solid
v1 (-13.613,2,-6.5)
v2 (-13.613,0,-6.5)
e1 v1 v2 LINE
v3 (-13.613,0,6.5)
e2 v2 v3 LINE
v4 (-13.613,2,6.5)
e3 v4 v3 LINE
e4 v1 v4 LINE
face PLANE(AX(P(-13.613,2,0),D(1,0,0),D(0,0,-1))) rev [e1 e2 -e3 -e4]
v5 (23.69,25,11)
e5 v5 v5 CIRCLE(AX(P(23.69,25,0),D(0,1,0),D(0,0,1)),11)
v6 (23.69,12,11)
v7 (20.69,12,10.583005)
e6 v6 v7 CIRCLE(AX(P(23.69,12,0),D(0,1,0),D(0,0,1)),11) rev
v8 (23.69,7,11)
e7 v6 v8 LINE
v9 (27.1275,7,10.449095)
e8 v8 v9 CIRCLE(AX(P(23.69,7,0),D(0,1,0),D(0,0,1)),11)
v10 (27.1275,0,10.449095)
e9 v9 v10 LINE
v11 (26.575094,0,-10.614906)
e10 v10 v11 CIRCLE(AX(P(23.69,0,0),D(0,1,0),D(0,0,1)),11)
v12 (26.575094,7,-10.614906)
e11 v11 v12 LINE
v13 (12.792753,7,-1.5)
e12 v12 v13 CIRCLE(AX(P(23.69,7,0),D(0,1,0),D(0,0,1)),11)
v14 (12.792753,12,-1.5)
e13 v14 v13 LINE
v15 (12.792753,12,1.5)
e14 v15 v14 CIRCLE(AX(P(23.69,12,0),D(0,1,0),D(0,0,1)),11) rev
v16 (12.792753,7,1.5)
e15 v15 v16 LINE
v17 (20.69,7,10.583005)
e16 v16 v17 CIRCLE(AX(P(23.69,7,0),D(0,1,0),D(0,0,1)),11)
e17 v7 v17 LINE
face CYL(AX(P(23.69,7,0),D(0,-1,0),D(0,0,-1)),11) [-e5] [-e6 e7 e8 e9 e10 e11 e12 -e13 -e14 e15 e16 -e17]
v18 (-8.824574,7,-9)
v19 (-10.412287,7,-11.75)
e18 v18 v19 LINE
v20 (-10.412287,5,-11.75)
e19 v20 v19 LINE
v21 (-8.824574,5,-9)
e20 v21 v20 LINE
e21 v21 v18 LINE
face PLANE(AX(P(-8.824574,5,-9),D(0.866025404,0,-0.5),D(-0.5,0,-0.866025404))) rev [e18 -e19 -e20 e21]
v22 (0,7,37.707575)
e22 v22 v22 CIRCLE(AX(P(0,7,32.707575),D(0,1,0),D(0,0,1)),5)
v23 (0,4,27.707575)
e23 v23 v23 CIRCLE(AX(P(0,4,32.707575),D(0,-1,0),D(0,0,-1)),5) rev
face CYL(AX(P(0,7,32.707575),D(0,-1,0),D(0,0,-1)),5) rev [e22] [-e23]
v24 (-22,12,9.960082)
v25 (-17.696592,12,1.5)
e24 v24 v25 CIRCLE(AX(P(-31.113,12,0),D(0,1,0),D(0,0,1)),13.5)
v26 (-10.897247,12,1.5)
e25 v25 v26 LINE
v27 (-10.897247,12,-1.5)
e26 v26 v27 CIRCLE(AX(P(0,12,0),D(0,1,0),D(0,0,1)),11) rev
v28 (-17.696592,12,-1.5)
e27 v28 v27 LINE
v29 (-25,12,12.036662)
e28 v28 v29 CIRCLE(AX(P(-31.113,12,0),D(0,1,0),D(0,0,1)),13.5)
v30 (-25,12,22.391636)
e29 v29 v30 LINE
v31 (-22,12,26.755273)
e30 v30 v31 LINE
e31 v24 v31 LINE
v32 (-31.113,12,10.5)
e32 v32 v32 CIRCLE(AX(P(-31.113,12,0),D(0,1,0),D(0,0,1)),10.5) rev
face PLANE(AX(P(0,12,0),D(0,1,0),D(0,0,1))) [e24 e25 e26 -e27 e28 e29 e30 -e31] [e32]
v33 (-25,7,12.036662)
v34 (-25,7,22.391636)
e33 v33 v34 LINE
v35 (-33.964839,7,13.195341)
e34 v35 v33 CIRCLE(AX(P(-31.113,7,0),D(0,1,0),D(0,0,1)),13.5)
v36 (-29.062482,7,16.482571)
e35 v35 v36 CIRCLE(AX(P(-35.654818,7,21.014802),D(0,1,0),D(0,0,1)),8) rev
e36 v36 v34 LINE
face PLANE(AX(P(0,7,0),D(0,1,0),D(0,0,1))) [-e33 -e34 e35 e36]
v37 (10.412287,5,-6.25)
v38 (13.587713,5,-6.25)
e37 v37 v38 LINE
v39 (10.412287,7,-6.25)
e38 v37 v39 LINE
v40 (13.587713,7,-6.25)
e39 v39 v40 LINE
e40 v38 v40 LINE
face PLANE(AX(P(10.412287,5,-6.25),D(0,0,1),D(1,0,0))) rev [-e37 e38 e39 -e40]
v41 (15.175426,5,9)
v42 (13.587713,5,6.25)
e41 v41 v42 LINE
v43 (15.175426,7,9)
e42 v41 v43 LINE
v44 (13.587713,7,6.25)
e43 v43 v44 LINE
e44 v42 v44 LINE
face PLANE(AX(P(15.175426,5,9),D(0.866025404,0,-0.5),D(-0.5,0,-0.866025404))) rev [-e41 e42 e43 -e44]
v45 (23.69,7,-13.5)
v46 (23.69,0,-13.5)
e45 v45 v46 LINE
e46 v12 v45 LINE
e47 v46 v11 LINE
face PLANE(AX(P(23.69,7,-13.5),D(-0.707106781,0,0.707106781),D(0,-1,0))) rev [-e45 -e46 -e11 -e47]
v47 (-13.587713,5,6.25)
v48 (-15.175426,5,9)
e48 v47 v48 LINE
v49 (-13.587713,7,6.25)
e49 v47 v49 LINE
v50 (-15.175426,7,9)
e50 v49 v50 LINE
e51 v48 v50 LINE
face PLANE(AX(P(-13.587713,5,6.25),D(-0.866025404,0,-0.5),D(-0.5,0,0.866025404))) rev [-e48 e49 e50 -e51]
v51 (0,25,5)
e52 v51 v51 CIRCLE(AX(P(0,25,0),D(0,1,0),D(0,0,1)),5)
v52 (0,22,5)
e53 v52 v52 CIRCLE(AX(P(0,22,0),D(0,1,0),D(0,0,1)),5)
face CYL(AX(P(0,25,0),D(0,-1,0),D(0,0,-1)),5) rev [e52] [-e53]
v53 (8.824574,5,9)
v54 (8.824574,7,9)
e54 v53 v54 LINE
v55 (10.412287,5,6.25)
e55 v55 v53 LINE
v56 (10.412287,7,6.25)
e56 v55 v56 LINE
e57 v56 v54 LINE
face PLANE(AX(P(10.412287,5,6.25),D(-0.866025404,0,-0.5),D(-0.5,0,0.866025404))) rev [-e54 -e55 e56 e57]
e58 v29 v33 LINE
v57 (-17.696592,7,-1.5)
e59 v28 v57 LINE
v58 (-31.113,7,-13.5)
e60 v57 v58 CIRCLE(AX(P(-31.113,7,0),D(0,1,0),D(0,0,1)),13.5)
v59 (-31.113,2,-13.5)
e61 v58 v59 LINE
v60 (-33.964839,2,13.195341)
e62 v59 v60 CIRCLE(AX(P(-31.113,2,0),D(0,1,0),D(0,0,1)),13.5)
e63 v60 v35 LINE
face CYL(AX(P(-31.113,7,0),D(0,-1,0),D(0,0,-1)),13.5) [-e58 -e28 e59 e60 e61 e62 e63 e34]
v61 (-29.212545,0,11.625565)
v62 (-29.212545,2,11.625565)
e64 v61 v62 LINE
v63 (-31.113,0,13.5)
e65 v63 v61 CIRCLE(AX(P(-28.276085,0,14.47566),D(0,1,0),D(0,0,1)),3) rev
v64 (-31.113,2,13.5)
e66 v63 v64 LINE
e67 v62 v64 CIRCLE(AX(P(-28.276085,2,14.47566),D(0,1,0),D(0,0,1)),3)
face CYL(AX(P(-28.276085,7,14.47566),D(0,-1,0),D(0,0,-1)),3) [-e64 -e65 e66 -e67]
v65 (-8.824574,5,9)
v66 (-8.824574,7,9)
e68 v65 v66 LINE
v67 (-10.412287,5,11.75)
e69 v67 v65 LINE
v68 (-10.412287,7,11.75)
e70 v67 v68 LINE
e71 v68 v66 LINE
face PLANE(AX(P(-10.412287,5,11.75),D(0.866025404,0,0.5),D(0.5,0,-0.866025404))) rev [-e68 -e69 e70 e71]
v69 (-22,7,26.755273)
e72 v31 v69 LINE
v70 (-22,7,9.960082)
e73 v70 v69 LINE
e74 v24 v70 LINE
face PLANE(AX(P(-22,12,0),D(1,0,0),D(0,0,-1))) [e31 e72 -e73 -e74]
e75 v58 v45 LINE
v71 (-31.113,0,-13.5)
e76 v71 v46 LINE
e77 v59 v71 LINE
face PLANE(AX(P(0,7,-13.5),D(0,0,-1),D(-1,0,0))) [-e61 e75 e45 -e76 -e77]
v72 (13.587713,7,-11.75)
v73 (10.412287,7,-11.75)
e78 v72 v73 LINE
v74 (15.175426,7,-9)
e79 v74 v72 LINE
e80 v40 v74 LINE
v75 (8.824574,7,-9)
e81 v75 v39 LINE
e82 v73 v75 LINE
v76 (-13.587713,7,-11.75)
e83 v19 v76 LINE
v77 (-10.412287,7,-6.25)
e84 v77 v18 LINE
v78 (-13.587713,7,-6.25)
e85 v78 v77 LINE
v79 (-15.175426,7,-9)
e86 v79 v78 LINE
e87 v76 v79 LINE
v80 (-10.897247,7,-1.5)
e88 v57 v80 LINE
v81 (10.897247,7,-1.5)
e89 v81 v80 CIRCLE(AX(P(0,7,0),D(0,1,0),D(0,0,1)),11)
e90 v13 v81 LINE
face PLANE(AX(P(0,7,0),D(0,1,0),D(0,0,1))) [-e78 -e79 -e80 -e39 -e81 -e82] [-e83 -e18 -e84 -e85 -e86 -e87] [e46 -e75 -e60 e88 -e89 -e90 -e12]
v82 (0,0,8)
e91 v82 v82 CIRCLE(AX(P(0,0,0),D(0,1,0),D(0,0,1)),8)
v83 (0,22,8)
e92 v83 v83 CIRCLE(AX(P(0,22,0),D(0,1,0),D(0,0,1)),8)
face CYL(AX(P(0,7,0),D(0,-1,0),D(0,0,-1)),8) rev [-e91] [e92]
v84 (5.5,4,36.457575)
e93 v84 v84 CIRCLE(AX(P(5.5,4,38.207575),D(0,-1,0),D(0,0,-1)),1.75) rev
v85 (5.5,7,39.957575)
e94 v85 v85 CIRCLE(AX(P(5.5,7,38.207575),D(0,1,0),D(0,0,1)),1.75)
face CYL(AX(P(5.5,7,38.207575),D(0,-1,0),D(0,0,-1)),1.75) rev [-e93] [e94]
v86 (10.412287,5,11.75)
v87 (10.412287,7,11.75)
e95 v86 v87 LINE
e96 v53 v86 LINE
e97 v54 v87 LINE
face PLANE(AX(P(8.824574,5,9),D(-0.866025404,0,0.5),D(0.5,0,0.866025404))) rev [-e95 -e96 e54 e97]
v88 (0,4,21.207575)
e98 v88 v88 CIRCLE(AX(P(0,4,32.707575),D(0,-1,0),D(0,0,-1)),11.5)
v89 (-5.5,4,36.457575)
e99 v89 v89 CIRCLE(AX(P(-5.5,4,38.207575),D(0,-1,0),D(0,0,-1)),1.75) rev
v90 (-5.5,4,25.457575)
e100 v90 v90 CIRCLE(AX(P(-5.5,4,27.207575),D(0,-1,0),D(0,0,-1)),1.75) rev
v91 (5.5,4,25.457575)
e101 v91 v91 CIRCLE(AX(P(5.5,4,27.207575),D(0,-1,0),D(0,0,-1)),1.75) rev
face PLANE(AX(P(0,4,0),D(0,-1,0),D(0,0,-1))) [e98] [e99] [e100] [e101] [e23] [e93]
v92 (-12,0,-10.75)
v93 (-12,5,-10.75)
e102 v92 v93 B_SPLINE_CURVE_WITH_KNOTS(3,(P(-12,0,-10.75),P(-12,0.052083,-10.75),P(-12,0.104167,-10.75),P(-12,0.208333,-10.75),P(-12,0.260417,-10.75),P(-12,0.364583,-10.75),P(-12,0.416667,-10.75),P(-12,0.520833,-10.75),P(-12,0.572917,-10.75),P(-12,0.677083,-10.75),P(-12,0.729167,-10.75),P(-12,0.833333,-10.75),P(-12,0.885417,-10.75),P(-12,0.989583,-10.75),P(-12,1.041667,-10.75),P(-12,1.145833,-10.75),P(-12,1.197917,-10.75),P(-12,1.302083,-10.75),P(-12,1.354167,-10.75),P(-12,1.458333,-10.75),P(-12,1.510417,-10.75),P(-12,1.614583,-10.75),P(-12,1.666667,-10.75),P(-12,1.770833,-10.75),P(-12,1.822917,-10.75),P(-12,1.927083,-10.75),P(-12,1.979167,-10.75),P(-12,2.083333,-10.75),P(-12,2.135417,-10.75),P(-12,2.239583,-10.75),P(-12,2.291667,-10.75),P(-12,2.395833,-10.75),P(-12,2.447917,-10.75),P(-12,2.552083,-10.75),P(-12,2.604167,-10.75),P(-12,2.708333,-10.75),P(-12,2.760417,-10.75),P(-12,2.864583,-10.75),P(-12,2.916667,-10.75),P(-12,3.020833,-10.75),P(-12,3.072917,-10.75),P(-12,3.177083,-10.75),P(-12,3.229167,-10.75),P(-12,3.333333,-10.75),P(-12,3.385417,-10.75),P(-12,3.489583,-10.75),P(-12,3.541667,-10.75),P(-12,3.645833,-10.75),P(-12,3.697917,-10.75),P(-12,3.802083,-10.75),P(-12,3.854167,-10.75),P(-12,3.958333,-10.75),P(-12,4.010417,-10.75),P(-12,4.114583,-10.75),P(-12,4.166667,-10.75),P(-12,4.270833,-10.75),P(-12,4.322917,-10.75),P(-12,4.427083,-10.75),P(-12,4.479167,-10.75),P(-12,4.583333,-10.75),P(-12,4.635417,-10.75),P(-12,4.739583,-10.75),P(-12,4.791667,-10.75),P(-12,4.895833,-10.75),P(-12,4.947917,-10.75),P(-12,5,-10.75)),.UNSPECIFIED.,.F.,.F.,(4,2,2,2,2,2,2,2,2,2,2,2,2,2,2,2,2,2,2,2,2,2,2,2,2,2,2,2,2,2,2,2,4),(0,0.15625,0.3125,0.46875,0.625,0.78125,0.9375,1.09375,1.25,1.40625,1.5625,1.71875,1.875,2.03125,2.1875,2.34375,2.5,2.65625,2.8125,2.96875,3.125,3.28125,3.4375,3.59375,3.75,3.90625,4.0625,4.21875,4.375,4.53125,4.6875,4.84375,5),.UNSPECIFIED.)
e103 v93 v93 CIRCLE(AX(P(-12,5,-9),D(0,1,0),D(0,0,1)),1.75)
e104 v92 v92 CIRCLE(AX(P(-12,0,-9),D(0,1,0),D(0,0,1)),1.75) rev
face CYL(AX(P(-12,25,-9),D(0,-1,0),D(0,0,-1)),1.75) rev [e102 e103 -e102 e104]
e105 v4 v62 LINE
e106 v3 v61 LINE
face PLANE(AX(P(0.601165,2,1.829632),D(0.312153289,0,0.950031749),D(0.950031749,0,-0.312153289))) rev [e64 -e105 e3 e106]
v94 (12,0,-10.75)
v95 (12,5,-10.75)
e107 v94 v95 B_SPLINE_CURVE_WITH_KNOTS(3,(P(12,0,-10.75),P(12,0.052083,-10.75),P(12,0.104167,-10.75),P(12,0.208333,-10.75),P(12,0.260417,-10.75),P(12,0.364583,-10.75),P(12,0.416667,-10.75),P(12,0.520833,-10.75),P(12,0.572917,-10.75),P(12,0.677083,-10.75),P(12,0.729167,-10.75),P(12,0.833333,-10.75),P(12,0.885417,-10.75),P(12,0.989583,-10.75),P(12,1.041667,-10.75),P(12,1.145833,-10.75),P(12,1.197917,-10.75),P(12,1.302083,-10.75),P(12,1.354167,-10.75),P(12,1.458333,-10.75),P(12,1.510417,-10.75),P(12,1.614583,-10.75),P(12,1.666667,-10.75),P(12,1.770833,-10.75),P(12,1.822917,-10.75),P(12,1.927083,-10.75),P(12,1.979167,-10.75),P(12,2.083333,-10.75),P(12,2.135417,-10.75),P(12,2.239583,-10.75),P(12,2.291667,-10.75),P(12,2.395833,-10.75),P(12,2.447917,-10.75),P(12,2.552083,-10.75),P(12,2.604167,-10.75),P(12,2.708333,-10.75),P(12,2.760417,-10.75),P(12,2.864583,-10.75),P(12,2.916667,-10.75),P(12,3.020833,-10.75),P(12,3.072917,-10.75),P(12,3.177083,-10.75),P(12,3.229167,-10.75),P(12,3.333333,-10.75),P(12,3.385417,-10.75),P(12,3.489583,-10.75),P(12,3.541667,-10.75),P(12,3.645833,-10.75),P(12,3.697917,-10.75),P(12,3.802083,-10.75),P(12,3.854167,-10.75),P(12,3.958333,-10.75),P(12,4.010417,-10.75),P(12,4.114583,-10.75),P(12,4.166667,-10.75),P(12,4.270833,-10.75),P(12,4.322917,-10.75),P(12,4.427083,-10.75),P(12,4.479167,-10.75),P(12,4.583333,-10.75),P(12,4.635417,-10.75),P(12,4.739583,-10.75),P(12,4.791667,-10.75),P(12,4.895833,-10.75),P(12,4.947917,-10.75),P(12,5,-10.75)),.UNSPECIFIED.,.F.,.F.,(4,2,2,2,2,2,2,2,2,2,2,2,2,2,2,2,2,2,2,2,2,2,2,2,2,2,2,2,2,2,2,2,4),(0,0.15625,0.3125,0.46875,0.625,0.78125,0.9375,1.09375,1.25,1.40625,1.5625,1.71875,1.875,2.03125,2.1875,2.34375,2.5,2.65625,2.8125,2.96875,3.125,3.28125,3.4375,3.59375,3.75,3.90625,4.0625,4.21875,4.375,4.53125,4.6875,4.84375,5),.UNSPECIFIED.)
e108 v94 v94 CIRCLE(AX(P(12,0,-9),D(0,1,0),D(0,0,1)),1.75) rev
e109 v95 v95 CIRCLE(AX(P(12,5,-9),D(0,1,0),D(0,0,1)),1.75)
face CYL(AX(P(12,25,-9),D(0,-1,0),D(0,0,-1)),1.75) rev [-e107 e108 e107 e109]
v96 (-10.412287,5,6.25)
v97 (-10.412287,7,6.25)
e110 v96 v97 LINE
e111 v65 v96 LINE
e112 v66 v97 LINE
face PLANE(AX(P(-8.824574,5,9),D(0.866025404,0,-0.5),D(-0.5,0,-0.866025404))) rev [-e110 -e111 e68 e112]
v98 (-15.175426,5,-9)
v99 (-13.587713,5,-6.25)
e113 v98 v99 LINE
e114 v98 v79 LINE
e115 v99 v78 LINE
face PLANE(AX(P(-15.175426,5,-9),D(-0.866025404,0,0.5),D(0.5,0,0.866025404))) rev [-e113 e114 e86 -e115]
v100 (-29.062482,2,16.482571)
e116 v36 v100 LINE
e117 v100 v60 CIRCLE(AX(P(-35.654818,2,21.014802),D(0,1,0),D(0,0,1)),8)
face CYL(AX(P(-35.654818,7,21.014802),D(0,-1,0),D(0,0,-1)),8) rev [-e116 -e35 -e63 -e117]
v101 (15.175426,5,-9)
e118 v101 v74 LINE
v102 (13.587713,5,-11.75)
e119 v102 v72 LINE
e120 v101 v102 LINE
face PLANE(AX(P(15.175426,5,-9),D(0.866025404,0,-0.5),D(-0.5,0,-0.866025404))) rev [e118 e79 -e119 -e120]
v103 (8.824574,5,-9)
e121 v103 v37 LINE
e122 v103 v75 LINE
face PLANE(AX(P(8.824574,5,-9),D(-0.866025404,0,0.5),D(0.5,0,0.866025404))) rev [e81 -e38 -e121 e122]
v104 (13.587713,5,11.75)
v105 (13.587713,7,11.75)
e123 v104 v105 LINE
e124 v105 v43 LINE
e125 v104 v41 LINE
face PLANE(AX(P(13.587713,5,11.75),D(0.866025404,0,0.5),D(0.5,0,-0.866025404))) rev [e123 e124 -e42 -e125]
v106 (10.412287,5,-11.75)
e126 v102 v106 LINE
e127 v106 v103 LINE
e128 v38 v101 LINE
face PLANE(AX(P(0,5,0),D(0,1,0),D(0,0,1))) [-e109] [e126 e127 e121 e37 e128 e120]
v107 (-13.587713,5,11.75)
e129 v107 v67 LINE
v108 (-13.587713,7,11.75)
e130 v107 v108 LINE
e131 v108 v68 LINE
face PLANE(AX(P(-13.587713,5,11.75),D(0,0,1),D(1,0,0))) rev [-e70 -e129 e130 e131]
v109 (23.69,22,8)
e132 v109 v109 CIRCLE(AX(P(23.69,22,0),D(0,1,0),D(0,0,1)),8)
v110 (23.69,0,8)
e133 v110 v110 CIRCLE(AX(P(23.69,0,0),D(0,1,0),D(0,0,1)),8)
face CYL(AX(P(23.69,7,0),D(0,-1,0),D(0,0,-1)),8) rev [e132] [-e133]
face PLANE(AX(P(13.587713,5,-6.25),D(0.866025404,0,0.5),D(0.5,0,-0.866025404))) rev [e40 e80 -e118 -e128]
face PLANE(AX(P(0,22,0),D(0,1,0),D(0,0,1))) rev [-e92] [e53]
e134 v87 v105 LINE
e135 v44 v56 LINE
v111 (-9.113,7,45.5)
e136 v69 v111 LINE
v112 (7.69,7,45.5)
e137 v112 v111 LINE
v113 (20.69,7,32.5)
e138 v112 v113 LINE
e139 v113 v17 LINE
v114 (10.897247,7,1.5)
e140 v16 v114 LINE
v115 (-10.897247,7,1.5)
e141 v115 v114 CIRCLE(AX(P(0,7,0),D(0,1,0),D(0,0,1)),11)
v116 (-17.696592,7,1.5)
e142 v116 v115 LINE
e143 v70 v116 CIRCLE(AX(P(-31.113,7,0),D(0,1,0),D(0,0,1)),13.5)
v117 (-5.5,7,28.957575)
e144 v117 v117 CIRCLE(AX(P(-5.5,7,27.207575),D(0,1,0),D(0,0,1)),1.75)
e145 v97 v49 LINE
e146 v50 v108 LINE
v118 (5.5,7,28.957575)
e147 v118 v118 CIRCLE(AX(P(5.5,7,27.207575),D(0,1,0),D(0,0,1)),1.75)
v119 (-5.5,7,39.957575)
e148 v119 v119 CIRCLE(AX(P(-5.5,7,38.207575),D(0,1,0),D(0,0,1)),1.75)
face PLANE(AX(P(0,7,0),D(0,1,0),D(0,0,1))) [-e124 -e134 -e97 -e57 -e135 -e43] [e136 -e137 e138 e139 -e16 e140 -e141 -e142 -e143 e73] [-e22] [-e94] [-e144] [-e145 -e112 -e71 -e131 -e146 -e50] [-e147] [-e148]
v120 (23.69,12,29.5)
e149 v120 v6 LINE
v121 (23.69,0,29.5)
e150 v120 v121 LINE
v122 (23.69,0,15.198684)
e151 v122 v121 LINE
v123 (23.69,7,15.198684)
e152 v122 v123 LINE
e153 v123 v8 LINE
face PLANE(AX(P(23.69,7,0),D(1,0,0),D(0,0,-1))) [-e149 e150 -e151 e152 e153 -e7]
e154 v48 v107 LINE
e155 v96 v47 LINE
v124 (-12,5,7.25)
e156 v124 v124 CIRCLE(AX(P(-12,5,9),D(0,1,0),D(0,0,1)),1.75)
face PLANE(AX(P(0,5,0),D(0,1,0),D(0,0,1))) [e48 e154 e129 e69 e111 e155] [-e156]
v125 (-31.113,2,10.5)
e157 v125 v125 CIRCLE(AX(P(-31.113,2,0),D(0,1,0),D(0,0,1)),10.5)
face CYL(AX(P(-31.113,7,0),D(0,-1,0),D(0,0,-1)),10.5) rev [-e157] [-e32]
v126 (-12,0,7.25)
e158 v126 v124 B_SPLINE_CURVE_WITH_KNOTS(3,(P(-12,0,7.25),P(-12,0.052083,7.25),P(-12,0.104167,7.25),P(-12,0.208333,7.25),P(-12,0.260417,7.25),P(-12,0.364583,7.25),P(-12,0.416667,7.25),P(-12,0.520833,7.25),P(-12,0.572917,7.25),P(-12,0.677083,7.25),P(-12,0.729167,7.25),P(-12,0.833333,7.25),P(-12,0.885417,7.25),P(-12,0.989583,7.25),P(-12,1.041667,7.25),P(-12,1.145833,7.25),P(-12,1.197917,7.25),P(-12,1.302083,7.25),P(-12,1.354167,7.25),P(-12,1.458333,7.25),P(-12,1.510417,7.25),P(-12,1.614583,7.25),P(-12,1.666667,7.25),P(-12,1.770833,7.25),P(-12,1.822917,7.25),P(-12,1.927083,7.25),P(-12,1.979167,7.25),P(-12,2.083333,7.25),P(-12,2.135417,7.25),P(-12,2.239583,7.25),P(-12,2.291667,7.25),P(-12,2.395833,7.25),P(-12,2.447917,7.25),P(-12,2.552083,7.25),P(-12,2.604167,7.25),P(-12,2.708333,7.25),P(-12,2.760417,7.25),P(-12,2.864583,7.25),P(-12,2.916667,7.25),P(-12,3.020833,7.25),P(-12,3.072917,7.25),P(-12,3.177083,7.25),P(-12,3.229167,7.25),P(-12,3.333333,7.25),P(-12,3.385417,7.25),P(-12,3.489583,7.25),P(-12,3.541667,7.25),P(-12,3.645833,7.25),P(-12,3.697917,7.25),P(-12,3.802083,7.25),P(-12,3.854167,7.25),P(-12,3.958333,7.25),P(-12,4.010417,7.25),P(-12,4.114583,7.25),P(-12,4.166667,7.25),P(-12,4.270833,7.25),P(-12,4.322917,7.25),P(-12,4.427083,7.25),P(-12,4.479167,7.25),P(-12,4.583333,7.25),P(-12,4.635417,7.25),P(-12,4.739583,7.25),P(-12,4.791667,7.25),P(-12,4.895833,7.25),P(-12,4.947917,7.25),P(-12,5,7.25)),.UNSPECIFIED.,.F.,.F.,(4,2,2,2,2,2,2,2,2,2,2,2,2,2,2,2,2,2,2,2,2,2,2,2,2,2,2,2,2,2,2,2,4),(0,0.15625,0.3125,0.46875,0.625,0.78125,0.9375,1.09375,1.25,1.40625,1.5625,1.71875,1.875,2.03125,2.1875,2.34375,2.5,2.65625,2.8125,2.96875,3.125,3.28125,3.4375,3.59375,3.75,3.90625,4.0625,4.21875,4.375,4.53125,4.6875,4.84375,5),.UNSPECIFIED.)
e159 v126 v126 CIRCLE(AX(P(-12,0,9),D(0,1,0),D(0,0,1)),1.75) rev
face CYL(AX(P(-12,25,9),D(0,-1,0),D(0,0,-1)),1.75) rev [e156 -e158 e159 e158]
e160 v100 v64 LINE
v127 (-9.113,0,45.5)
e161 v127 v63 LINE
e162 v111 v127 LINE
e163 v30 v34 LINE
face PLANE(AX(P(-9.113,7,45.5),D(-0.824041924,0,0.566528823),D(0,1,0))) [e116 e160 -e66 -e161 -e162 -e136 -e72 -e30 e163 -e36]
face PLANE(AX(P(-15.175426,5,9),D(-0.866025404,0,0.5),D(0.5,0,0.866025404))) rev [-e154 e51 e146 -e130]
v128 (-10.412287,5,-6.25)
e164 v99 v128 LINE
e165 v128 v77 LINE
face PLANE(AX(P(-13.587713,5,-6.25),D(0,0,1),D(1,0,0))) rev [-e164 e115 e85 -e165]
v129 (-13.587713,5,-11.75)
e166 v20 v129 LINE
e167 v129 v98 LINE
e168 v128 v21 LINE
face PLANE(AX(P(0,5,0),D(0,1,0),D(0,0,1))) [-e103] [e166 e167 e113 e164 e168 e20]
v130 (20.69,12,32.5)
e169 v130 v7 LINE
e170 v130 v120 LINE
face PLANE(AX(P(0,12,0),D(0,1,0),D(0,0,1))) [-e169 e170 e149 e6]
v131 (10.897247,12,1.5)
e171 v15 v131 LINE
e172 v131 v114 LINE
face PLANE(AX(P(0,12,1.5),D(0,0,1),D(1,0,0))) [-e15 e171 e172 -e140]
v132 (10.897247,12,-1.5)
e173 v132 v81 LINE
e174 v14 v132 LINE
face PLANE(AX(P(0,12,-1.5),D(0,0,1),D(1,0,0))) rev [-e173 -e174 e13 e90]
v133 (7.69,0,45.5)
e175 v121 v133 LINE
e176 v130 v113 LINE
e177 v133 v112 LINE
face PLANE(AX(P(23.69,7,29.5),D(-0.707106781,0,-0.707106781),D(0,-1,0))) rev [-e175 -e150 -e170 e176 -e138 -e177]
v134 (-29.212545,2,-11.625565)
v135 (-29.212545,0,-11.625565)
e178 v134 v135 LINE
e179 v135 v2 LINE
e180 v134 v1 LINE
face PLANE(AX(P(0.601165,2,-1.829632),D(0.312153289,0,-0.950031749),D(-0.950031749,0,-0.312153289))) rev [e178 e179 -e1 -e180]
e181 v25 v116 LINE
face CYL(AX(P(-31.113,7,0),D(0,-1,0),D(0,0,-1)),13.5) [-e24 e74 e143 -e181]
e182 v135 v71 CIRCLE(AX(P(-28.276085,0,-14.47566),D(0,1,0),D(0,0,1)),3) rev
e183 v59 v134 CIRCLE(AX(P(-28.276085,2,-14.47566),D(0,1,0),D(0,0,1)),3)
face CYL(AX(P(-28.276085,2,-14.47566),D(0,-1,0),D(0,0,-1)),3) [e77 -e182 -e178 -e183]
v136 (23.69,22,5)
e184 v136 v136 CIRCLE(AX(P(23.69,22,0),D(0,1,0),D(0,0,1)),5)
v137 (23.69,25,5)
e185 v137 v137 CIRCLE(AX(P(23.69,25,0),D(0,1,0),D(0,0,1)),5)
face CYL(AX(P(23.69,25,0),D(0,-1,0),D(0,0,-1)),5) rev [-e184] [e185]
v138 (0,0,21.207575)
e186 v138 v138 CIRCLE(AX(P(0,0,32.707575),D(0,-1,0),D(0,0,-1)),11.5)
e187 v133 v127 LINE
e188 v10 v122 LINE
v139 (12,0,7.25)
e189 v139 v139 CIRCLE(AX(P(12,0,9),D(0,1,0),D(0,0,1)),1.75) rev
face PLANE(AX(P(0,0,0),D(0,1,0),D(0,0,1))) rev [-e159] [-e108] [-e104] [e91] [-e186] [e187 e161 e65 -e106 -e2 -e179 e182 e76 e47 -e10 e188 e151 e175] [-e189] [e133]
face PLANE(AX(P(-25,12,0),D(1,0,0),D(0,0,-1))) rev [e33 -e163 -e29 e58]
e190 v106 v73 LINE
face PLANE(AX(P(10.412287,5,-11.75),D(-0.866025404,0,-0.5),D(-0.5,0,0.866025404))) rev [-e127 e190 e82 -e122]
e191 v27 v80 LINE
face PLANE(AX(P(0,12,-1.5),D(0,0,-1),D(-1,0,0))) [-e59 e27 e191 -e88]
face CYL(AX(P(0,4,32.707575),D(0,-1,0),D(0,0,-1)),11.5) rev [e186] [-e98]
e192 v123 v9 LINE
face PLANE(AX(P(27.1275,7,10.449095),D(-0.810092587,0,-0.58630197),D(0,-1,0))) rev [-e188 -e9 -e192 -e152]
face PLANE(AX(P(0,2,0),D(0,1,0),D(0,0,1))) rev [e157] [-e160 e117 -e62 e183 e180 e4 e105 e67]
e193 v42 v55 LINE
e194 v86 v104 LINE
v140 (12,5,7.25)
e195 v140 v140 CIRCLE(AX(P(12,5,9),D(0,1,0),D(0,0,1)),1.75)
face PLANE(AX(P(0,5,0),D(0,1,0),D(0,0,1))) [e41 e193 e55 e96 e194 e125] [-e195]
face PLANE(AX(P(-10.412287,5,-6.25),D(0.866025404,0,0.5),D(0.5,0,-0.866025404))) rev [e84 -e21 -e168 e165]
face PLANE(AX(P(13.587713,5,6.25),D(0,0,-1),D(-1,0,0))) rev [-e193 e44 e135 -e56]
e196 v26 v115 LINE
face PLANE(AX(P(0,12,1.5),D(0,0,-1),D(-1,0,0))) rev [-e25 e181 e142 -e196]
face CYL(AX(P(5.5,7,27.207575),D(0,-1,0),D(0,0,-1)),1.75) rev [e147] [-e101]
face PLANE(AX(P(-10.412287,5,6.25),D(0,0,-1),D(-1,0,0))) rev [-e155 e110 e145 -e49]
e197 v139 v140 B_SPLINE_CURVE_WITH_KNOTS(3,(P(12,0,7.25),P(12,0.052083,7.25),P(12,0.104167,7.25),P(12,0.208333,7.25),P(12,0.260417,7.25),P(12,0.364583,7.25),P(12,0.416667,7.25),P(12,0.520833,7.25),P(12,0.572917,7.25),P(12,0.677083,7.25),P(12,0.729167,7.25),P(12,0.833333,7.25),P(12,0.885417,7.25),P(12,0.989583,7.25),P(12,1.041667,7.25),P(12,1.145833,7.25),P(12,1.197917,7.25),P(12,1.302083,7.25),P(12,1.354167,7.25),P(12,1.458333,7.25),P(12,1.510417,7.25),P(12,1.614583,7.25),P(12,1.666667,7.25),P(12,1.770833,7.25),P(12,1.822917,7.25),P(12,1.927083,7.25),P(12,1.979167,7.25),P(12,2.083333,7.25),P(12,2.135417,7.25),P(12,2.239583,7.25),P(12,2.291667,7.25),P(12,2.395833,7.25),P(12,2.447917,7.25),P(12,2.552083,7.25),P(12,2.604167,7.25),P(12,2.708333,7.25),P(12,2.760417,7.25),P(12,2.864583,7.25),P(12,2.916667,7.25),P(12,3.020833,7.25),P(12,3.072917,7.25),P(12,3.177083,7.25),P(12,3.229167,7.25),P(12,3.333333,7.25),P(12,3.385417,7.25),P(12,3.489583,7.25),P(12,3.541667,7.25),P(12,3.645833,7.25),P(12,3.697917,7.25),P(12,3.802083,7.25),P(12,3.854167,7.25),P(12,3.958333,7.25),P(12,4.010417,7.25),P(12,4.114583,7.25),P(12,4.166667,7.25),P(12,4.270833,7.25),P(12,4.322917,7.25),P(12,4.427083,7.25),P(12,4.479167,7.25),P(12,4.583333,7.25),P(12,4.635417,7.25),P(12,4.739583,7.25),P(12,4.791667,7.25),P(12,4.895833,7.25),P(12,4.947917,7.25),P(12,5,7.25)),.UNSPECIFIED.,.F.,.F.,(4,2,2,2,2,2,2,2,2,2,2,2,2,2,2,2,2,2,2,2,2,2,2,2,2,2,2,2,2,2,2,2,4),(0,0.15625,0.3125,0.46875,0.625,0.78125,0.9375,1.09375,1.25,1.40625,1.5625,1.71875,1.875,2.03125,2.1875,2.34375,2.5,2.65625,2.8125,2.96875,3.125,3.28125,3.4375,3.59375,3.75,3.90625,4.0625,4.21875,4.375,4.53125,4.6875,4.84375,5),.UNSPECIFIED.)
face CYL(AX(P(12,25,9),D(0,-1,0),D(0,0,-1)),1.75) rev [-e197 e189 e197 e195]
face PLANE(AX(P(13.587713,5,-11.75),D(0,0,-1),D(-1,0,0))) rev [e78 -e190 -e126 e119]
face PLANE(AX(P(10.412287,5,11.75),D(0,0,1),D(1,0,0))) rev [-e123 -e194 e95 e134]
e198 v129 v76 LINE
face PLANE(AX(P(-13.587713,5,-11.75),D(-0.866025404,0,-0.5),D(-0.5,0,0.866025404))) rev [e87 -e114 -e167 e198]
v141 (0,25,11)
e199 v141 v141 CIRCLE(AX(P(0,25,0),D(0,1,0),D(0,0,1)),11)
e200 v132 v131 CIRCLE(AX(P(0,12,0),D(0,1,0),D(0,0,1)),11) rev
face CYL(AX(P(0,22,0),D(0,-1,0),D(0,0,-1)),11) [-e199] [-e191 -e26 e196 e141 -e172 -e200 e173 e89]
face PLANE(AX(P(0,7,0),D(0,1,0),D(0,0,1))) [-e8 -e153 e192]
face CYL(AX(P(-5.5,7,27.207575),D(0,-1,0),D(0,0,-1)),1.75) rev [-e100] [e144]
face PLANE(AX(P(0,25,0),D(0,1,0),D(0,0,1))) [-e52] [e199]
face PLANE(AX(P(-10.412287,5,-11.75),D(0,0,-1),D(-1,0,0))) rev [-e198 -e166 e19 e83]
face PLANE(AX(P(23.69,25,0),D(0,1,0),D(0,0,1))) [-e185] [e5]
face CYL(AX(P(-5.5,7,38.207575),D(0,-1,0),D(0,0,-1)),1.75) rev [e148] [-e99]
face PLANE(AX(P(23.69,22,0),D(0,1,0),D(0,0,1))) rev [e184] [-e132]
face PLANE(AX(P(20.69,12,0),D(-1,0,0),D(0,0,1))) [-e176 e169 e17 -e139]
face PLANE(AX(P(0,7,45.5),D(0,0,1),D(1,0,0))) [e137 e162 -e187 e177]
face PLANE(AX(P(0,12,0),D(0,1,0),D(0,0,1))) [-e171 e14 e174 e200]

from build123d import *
from build123d.topology import SkipClean

# Parameters (mm, degrees)
SKETCH3_R               = 8
SKETCH3_W               = 54.803
SKETCH3_H               = 32
SKETCH3_R_2             = 5
BOSS_EXTRUDE1_DEPTH     = 7
CUT_EXTRUDE3_DEPTH      = 65.105926161
CUT_EXTRUDE3_DEPTH_BACK = 65.105926161
SKETCH4_R               = 1.75
SKETCH6_R               = 11
SKETCH6_R_2             = 8
BOSS_EXTRUDE2_DEPTH     = 15
SKETCH7_R               = 11
SKETCH7_R_2             = 5
BOSS_EXTRUDE3_DEPTH     = 3
CHAMFER1_SIZE           = 2.5
CUT_EXTRUDE4_DEPTH      = 2
CUT_EXTRUDE5_DEPTH      = 69.451221823
CUT_EXTRUDE5_DEPTH_BACK = 69.451221823
SKETCH9_R               = 1.75
CUT_EXTRUDE6_START      = -2
SKETCH10_R              = 1.75
CUT_EXTRUDE6_DEPTH      = 2
CHAMFER3_SIZE           = 32
CHAMFER3_SIZE2          = 22
CHAMFER4_SIZE           = 16
FILLET1_R               = 8
SKETCH12_R              = 10.5
BOSS_EXTRUDE4_DEPTH     = 5
BOSS_EXTRUDE5_DEPTH     = 5
SKETCH14_R              = 11.5
SKETCH14_R_2            = 5
SKETCH14_R_3            = 1.75
CUT_EXTRUDE8_DEPTH      = 4
FILLET2_R               = 3


with BuildPart() as part:
    # Sketch3 → Boss-Extrude1 (new body)
    # profile 1 of 10: a face of its own
    with BuildSketch(Plane(origin=(0, 0, 0), x_dir=(1, 0, 0), z_dir=(0, 1, 0))):
        with BuildLine():
            ThreePointArc((-17.613, 0), (-21.567058454, 9.545941546), (-31.113, 13.5))
            Line((-31.113, 13.5), (-31.113, 10.5))
            ThreePointArc((-31.113, 10.5), (-23.688378798, 7.424621202), (-20.613, 0))
            ThreePointArc((-20.613, 0), (-23.688378798, -7.424621202), (-31.113, -10.5))
            Line((-31.113, -10.5), (-31.113, -13.5))
            ThreePointArc((-31.113, -13.5), (-21.567058454, -9.545941546), (-17.613, 0))
        make_face()
    # profile 2 of 10: a face of its own
    with BuildSketch(Plane(origin=(0, 0, 0), x_dir=(1, 0, 0), z_dir=(0, 1, 0))):
        with BuildLine():
            Line((-31.113, 10.5), (-31.113, 13.5))
            ThreePointArc((-31.113, 13.5), (-44.613, 0), (-31.113, -13.5))
            Line((-31.113, -13.5), (-31.113, -10.5))
            ThreePointArc((-31.113, -10.5), (-41.613, 0), (-31.113, 10.5))
        make_face()
    # profile 3 of 10: a face of its own
    with BuildSketch(Plane(origin=(0, 0, 0), x_dir=(1, 0, 0), z_dir=(0, 1, 0))):
        with BuildLine():
            Line((23.69, 13.5), (-31.113, 13.5))
            ThreePointArc((-31.113, 13.5), (-21.567058454, 9.545941546), (-17.613, 0))
            ThreePointArc((-17.613, 0), (-21.567058454, -9.545941546), (-31.113, -13.5))
            Line((-31.113, -13.5), (23.69, -13.5))
            Line((23.69, -13.5), (23.69, -11))
            ThreePointArc((23.69, -11), (12.69, 0), (23.69, 11))
            Line((23.69, 11), (23.69, 13.5))
        make_face()
        with Locations(Location((0, 0, 0), (0, 0, 270))):
            Circle(SKETCH3_R, mode=Mode.SUBTRACT)
    # profile 4 of 10: a face of its own
    with BuildSketch(Plane(origin=(0, 0, 0), x_dir=(1, 0, 0), z_dir=(0, 1, 0))):
        with BuildLine():
            ThreePointArc((-17.613, 0), (-21.567058454, 9.545941546), (-31.113, 13.5))
            Line((-31.113, 13.5), (-31.113, 10.5))
            ThreePointArc((-31.113, 10.5), (-23.688378798, 7.424621202), (-20.613, 0))
            ThreePointArc((-20.613, 0), (-23.688378798, -7.424621202), (-31.113, -10.5))
            Line((-31.113, -10.5), (-31.113, -13.5))
            ThreePointArc((-31.113, -13.5), (-21.567058454, -9.545941546), (-17.613, 0))
        make_face()
    # profile 5 of 10: a face of its own
    with BuildSketch(Plane(origin=(0, 0, 0), x_dir=(1, 0, 0), z_dir=(0, 1, 0))):
        with BuildLine():
            Line((-31.113, 10.5), (-31.113, 13.5))
            ThreePointArc((-31.113, 13.5), (-44.613, 0), (-31.113, -13.5))
            Line((-31.113, -13.5), (-31.113, -10.5))
            ThreePointArc((-31.113, -10.5), (-41.613, 0), (-31.113, 10.5))
        make_face()
    # profile 6 of 10: a face of its own
    with BuildSketch(Plane(origin=(0, 0, 0), x_dir=(1, 0, 0), z_dir=(0, 1, 0))):
        with BuildLine():
            ThreePointArc((34.69, 0), (31.468174593, 7.778174593), (23.69, 11))
            Line((23.69, 11), (23.69, 8))
            ThreePointArc((23.69, 8), (29.346854249, 5.656854249), (31.69, 0))
            ThreePointArc((31.69, 0), (29.346854249, -5.656854249), (23.69, -8))
            Line((23.69, -8), (23.69, -11))
            ThreePointArc((23.69, -11), (31.468174593, -7.778174593), (34.69, 0))
        make_face()
    # profile 7 of 10: a face of its own
    with BuildSketch(Plane(origin=(0, 0, 0), x_dir=(1, 0, 0), z_dir=(0, 1, 0))):
        with BuildLine():
            Line((23.69, 8), (23.69, 11))
            ThreePointArc((23.69, 11), (12.69, 0), (23.69, -11))
            Line((23.69, -11), (23.69, -8))
            ThreePointArc((23.69, -8), (15.69, 0), (23.69, 8))
        make_face()
    # profile 8 of 10: a face of its own
    with BuildSketch(Plane(origin=(0, 0, 0), x_dir=(1, 0, 0), z_dir=(0, 1, 0))):
        with Locations((-3.7115, -29.5)):
            Rectangle(SKETCH3_W, SKETCH3_H)
        with Locations(Location((0, -32.707574931, 0), (0, 0, 270))):
            Circle(SKETCH3_R_2, mode=Mode.SUBTRACT)
    # profile 9 of 10: a face of its own
    with BuildSketch(Plane(origin=(0, 0, 0), x_dir=(1, 0, 0), z_dir=(0, 1, 0))):
        with BuildLine():
            ThreePointArc((34.69, 0), (31.468174593, 7.778174593), (23.69, 11))
            Line((23.69, 11), (23.69, 8))
            ThreePointArc((23.69, 8), (29.346854249, 5.656854249), (31.69, 0))
            ThreePointArc((31.69, 0), (29.346854249, -5.656854249), (23.69, -8))
            Line((23.69, -8), (23.69, -11))
            ThreePointArc((23.69, -11), (31.468174593, -7.778174593), (34.69, 0))
        make_face()
    # profile 10 of 10: a face of its own
    with BuildSketch(Plane(origin=(0, 0, 0), x_dir=(1, 0, 0), z_dir=(0, 1, 0))):
        with BuildLine():
            Line((23.69, 8), (23.69, 11))
            ThreePointArc((23.69, 11), (12.69, 0), (23.69, -11))
            Line((23.69, -11), (23.69, -8))
            ThreePointArc((23.69, -8), (15.69, 0), (23.69, 8))
        make_face()
    extrude(amount=BOSS_EXTRUDE1_DEPTH)

    # Sketch4 → Cut-Extrude3 (cut, two sides: drawn at the far end of the back side and taken through both)
    with BuildSketch(Plane(origin=(0, 0, 0), x_dir=(1, 0, 0), z_dir=(0, 1, 0)).offset(-CUT_EXTRUDE3_DEPTH_BACK)):
        with Locations(Location((5.5, -27.207574931, 0), (0, 0, 270))):
            Circle(SKETCH4_R)
        with Locations(Location((5.5, -38.207574931, 0), (0, 0, 270))):
            Circle(SKETCH4_R)
        with Locations(Location((-5.5, -38.207574931, 0), (0, 0, 270))):
            Circle(SKETCH4_R)
        with Locations(Location((-5.5, -27.207574931, 0), (0, 0, 270))):
            Circle(SKETCH4_R)
    extrude(amount=CUT_EXTRUDE3_DEPTH + CUT_EXTRUDE3_DEPTH_BACK, mode=Mode.SUBTRACT)

    # Sketch6 → Boss-Extrude2 (add)
    # profile 1 of 2: a face of its own
    with BuildSketch(Plane(origin=(0, 7, 0), x_dir=(1, 0, 0), z_dir=(0, 1, 0))):
        with Locations(Location((23.69, 0, 0), (0, 0, 270))):
            Circle(SKETCH6_R)
        with Locations(Location((23.69, 0, 0), (0, 0, 270))):
            Circle(SKETCH6_R_2, mode=Mode.SUBTRACT)
    # profile 2 of 2: a face of its own
    with BuildSketch(Plane(origin=(0, 7, 0), x_dir=(1, 0, 0), z_dir=(0, 1, 0))):
        with Locations(Location((0, 0, 0), (0, 0, 270))):
            Circle(SKETCH6_R)
        with Locations(Location((0, 0, 0), (0, 0, 270))):
            Circle(SKETCH6_R_2, mode=Mode.SUBTRACT)
    extrude(amount=BOSS_EXTRUDE2_DEPTH)

    # Sketch7 → Boss-Extrude3 (add)
    # profile 1 of 2: a face of its own
    with BuildSketch(Plane(origin=(0, 22, 0), x_dir=(1, 0, 0), z_dir=(0, 1, 0))):
        with Locations(Location((23.69, 0, 0), (0, 0, 270))):
            Circle(SKETCH7_R)
        with Locations(Location((23.69, 0, 0), (0, 0, 270))):
            Circle(SKETCH7_R_2, mode=Mode.SUBTRACT)
    # profile 2 of 2: a face of its own
    with BuildSketch(Plane(origin=(0, 22, 0), x_dir=(1, 0, 0), z_dir=(0, 1, 0))):
        with Locations(Location((0, 0, 0), (0, 0, 270))):
            Circle(SKETCH7_R)
        with Locations(Location((0, 0, 0), (0, 0, 270))):
            Circle(SKETCH7_R_2, mode=Mode.SUBTRACT)
    extrude(amount=BOSS_EXTRUDE3_DEPTH)

    # Chamfer1
    # the kernel refuses this chamfer: 2.5 mm, written as the material it adds along each edge
    with BuildSketch(Plane(origin=(23.69, 0, -11), x_dir=(0.9912092295509807, 0, 0.13230367815352426), z_dir=(0, 1, 0))) as chamfer1_piece_1_section:
        with BuildLine():
            Line((2.910680919, 0), (-CHAMFER1_SIZE * 0.132303678154, CHAMFER1_SIZE * 0.991209229551))
            Line((-CHAMFER1_SIZE * 0.132303678154, CHAMFER1_SIZE * 0.991209229551), (0, 0))
            ThreePointArc((0, 0), (1.49552658, 0.096625069), (2.910680919, 0))
        make_face()
    chamfer1_piece_1 = extrude(amount=7, mode=Mode.PRIVATE)
    chamfer1_piece_1 = split(chamfer1_piece_1, bisect_by=Plane(origin=(23.69, 0, -13.5), z_dir=(0, 0, 1)), keep=Keep.TOP, mode=Mode.PRIVATE)
    add(chamfer1_piece_1)

    # Sketch8 → Cut-Extrude4 (cut)
    with BuildSketch(Plane(origin=(0, 0, 0), x_dir=(1, 0, 0), z_dir=(0, 1, 0))):
        Polygon((-31.113, -12.25), (-31.113, 0), (-31.113, 12.25), (-31.113, 13.5), (-51.113, 13.5), (-51.113, -13.5), (-31.113, -13.5), align=None)
        Polygon((-31.113, 12.25), (-31.113, 0), (-31.113, -12.25), (-13.613, -6.5), (-13.613, 6.5), align=None)
    extrude(amount=CUT_EXTRUDE4_DEPTH, mode=Mode.SUBTRACT)

    # Sketch9 → Cut-Extrude5 (cut, two sides: drawn at the far end of the back side and taken through both)
    with BuildSketch(Plane(origin=(0, 0, 0), x_dir=(1, 0, 0), z_dir=(0, 1, 0)).offset(-CUT_EXTRUDE5_DEPTH_BACK)):
        with Locations(Location((12, 9, 0), (0, 0, 90))):
            Circle(SKETCH9_R)
        with Locations(Location((12, -9, 0), (0, 0, 90))):
            Circle(SKETCH9_R)
        with Locations(Location((-12, -9, 0), (0, 0, 90))):
            Circle(SKETCH9_R)
        with Locations(Location((-12, 9, 0), (0, 0, 90))):
            Circle(SKETCH9_R)
    extrude(amount=CUT_EXTRUDE5_DEPTH + CUT_EXTRUDE5_DEPTH_BACK, mode=Mode.SUBTRACT)

    # Sketch10 → Cut-Extrude6 (cut)
    # profile 1 of 4: a face of its own
    with BuildSketch(Plane(origin=(0, 7, 0), x_dir=(1, 0, 0), z_dir=(0, 1, 0)).offset(CUT_EXTRUDE6_START)):
        Polygon((-15.175426481, -9), (-13.58771324, -11.75), (-10.41228676, -11.75), (-8.824573519, -9), (-10.41228676, -6.25), (-13.58771324, -6.25), align=None)
        with Locations(Location((-12, -9, 0), (0, 0, 90))):
            Circle(SKETCH10_R, mode=Mode.SUBTRACT)
    # profile 2 of 4: a face of its own
    with BuildSketch(Plane(origin=(0, 7, 0), x_dir=(1, 0, 0), z_dir=(0, 1, 0)).offset(CUT_EXTRUDE6_START)):
        Polygon((-15.175426481, 9), (-13.58771324, 6.25), (-10.41228676, 6.25), (-8.824573519, 9), (-10.41228676, 11.75), (-13.58771324, 11.75), align=None)
        with Locations(Location((-12, 9, 0), (0, 0, 90))):
            Circle(SKETCH10_R, mode=Mode.SUBTRACT)
    # profile 3 of 4: a face of its own
    with BuildSketch(Plane(origin=(0, 7, 0), x_dir=(1, 0, 0), z_dir=(0, 1, 0)).offset(CUT_EXTRUDE6_START)):
        Polygon((15.175426481, 9), (13.58771324, 11.75), (10.41228676, 11.75), (8.824573519, 9), (10.41228676, 6.25), (13.58771324, 6.25), align=None)
        with Locations(Location((12, 9, 0), (0, 0, 90))):
            Circle(SKETCH10_R, mode=Mode.SUBTRACT)
    # profile 4 of 4: a face of its own
    with BuildSketch(Plane(origin=(0, 7, 0), x_dir=(1, 0, 0), z_dir=(0, 1, 0)).offset(CUT_EXTRUDE6_START)):
        Polygon((15.175426481, -9), (13.58771324, -6.25), (10.41228676, -6.25), (8.824573519, -9), (10.41228676, -11.75), (13.58771324, -11.75), align=None)
        with Locations(Location((12, -9, 0), (0, 0, 90))):
            Circle(SKETCH10_R, mode=Mode.SUBTRACT)
    extrude(amount=CUT_EXTRUDE6_DEPTH, mode=Mode.SUBTRACT)

    # Chamfer2
    # the kernel refuses this chamfer: 5 mm, written as the material it adds along each edge
    with BuildSketch(Plane(origin=(23.69, 0, 11), x_dir=(0.9874000606639179, 0, -0.15824386307497393), z_dir=(0, 1, 0))) as chamfer2_piece_1:
        with BuildLine():
            Line((3.622786344, 0.141421356), (-0.805837357, -4.287202344))
            Line((-0.805837357, -4.287202344), (-0.904577363, -4.271377958))
            ThreePointArc((-0.904577363, -4.271377958), (-0.443767224, -2.137054655), (-0.098740006, 0.015824386))
            Line((-0.098740006, 0.015824386), (0.015824386, 0.098740006))
            ThreePointArc((0.015824386, 0.098740006), (1.81210794, -0.038365312), (3.606961958, 0.240161362))
            Line((3.606961958, 0.240161362), (3.622786344, 0.141421356))
        make_face()
    extrude(amount=7)

    # Chamfer3
    chamfer3_edges = [part.edges().sort_by_distance(p)[0] for p in [
        (-31.113, 3.5, 45.5),
    ]]
    chamfer3_side = [part.faces().sort_by_distance(p)[0] for p in [
        (-31.113, 3.472406181, 29.316501104),
    ]]
    chamfer(chamfer3_edges, length=CHAMFER3_SIZE, length2=CHAMFER3_SIZE2, reference=chamfer3_side[0])

    # Chamfer4
    chamfer4_edges = [part.edges().sort_by_distance(p)[0] for p in [
        (23.69, 3.5, 45.5),
    ]]
    chamfer(chamfer4_edges, length=CHAMFER4_SIZE)

    # Fillet1
    fillet1_edges = [part.edges().sort_by_distance(p)[0] for p in [
        (-31.113, 4.5, 13.5),
    ]]
    fillet(fillet1_edges, radius=FILLET1_R)

    # Sketch12 → Boss-Extrude4 (add)
    # profile 1 of 4: a face of its own
    with BuildSketch(Plane(origin=(0, 7, 0), x_dir=(1, 0, 0), z_dir=(0, 1, 0))):
        with BuildLine():
            ThreePointArc((11, 0), (10.974281775, -0.751757625), (10.897247359, -1.5))
            Line((10.897247359, -1.5), (12.792752641, -1.5))
            ThreePointArc((12.792752641, -1.5), (12.69, 0), (12.792752641, 1.5))
            Line((12.792752641, 1.5), (10.897247359, 1.5))
            ThreePointArc((10.897247359, 1.5), (10.974281775, 0.751757625), (11, 0))
        make_face()
    # profile 2 of 4: a face of its own
    with BuildSketch(Plane(origin=(0, 7, 0), x_dir=(1, 0, 0), z_dir=(0, 1, 0))):
        with BuildLine():
            ThreePointArc((-17.613, 0), (-17.633914234, -0.751163705), (-17.696592135, -1.5))
            Line((-17.696592135, -1.5), (-10.897247359, -1.5))
            ThreePointArc((-10.897247359, -1.5), (-11, 0), (-10.897247359, 1.5))
            Line((-10.897247359, 1.5), (-17.696592135, 1.5))
            ThreePointArc((-17.696592135, 1.5), (-17.633914234, 0.751163705), (-17.613, 0))
        make_face()
    # profile 3 of 4: a face of its own
    with BuildSketch(Plane(origin=(0, 7, 0), x_dir=(1, 0, 0), z_dir=(0, 1, 0))):
        with BuildLine():
            Line((-17.696592135, -1.5), (-19.418433475, -1.5))
            Line((-19.418433475, -1.5), (-19.418433475, 1.5))
            Line((-19.418433475, 1.5), (-17.696592135, 1.5))
            ThreePointArc((-17.696592135, 1.5), (-22.113, 10.062305899), (-31.113, 13.5))
            ThreePointArc((-31.113, 13.5), (-44.536619079, 1.434033058), (-33.96483904, -13.19534062))
            ThreePointArc((-33.96483904, -13.19534062), (-23.232785747, -10.961396961), (-17.696592135, -1.5))
        make_face()
        with Locations(Location((-31.113, 0, 0), (0, 0, 270))):
            Circle(SKETCH12_R, mode=Mode.SUBTRACT)
    # profile 4 of 4: a face of its own
    with BuildSketch(Plane(origin=(0, 7, 0), x_dir=(1, 0, 0), z_dir=(0, 1, 0))):
        with BuildLine():
            Line((-19.418433475, 1.5), (-19.418433475, -1.5))
            Line((-19.418433475, -1.5), (-17.696592135, -1.5))
            ThreePointArc((-17.696592135, -1.5), (-17.633914234, -0.751163705), (-17.613, 0))
            ThreePointArc((-17.613, 0), (-17.633914234, 0.751163705), (-17.696592135, 1.5))
            Line((-17.696592135, 1.5), (-19.418433475, 1.5))
        make_face()
    extrude(amount=BOSS_EXTRUDE4_DEPTH)

    # Sketch13 → Boss-Extrude5 (add)
    with BuildSketch(Plane(origin=(0, 7, 0), x_dir=(1, 0, 0), z_dir=(0, 1, 0))):
        with BuildLine():
            Line((23.69, -29.5), (23.69, -15.198684154))
            Line((23.69, -15.198684154), (23.69, -11))
            ThreePointArc((23.69, -11), (22.175578937, -10.895252583), (20.69, -10.583005244))
            Line((20.69, -10.583005244), (20.69, -32.5))
            Line((20.69, -32.5), (23.69, -29.5))
        make_face()
        with BuildLine():
            Line((-25, -22.391636364), (-22, -26.755272727))
            Line((-22, -26.755272727), (-22, -9.960081877))
            ThreePointArc((-22, -9.960081877), (-23.429523235, -11.100188503), (-25, -12.036661954))
            Line((-25, -12.036661954), (-25, -22.391636364))
        make_face()
    extrude(amount=BOSS_EXTRUDE5_DEPTH)

    # Sketch14 → Cut-Extrude8 (cut)
    with SkipClean():  # the faces are left unmerged after this step: merging them gives an invalid solid
        with BuildSketch(Plane.XZ):
            with Locations(Location((0, 32.707574931, 0), (0, 0, 270))):
                Circle(SKETCH14_R)
            with Locations(Location((0, 32.707574931, 0), (0, 0, 270))):
                Circle(SKETCH14_R_2, mode=Mode.SUBTRACT)
            with Locations(Location((5.5, 38.207574931, 0), (0, 0, 270))):
                Circle(SKETCH14_R_3, mode=Mode.SUBTRACT)
            with Locations(Location((-5.5, 27.207574931, 0), (0, 0, 270))):
                Circle(SKETCH14_R_3, mode=Mode.SUBTRACT)
            with Locations(Location((-5.5, 38.207574931, 0), (0, 0, 270))):
                Circle(SKETCH14_R_3, mode=Mode.SUBTRACT)
            with Locations(Location((5.5, 27.207574931, 0), (0, 0, 270))):
                Circle(SKETCH14_R_3, mode=Mode.SUBTRACT)
        extrude(amount=-CUT_EXTRUDE8_DEPTH, mode=Mode.SUBTRACT)

    # Fillet2
    # the kernel refuses this fillet: 3 mm, written as the material it takes off along each edge
    with BuildSketch(Plane(origin=(-31.113, -5.001031038, -12.25), x_dir=(0.9500317490404903, 0, 0.3121532889704462), z_dir=(0, 1, 0))) as fillet2_piece_1:
        with BuildLine():
            CenterArc((2.000412415, 3), FILLET2_R, 217.167948486, 52.832051514)
            Line((-0.390191611, 1.187539686), (-0.438003692, 1.15129048))
            ThreePointArc((-0.438003692, 1.15129048), (-0.252097711, 0.575040646), (-0.057001905, -0.018729197))
            Line((-0.057001905, -0.018729197), (0, -0.06))
            Line((0, -0.06), (2.000412415, -0.06))
            Line((2.000412415, -0.06), (2.000412415, 0))
        make_face()
    extrude(amount=7.001031038, mode=Mode.SUBTRACT)
    with BuildSketch(Plane(origin=(-31.113, -5.001031038, 12.25), x_dir=(0, 0, 1), z_dir=(0, 1, 0))) as fillet2_piece_2:
        with BuildLine():
            CenterArc((2.225659932, 2.836915173), FILLET2_R, 198.1890457, 52.832051514)
            Line((-0.624435315, 1.900455306), (-0.68143722, 1.881726108))
            Line((-0.68143722, 1.881726108), (-0.057001905, -0.018729197))
            Line((-0.057001905, -0.018729197), (0, -0.06))
            ThreePointArc((0, -0.06), (0.625, -0.06), (1.230486801, -0.056738303))
            Line((1.230486801, -0.056738303), (1.25, 0))
        make_face()
    extrude(amount=7.001031038, mode=Mode.SUBTRACT)


solid = part.part
